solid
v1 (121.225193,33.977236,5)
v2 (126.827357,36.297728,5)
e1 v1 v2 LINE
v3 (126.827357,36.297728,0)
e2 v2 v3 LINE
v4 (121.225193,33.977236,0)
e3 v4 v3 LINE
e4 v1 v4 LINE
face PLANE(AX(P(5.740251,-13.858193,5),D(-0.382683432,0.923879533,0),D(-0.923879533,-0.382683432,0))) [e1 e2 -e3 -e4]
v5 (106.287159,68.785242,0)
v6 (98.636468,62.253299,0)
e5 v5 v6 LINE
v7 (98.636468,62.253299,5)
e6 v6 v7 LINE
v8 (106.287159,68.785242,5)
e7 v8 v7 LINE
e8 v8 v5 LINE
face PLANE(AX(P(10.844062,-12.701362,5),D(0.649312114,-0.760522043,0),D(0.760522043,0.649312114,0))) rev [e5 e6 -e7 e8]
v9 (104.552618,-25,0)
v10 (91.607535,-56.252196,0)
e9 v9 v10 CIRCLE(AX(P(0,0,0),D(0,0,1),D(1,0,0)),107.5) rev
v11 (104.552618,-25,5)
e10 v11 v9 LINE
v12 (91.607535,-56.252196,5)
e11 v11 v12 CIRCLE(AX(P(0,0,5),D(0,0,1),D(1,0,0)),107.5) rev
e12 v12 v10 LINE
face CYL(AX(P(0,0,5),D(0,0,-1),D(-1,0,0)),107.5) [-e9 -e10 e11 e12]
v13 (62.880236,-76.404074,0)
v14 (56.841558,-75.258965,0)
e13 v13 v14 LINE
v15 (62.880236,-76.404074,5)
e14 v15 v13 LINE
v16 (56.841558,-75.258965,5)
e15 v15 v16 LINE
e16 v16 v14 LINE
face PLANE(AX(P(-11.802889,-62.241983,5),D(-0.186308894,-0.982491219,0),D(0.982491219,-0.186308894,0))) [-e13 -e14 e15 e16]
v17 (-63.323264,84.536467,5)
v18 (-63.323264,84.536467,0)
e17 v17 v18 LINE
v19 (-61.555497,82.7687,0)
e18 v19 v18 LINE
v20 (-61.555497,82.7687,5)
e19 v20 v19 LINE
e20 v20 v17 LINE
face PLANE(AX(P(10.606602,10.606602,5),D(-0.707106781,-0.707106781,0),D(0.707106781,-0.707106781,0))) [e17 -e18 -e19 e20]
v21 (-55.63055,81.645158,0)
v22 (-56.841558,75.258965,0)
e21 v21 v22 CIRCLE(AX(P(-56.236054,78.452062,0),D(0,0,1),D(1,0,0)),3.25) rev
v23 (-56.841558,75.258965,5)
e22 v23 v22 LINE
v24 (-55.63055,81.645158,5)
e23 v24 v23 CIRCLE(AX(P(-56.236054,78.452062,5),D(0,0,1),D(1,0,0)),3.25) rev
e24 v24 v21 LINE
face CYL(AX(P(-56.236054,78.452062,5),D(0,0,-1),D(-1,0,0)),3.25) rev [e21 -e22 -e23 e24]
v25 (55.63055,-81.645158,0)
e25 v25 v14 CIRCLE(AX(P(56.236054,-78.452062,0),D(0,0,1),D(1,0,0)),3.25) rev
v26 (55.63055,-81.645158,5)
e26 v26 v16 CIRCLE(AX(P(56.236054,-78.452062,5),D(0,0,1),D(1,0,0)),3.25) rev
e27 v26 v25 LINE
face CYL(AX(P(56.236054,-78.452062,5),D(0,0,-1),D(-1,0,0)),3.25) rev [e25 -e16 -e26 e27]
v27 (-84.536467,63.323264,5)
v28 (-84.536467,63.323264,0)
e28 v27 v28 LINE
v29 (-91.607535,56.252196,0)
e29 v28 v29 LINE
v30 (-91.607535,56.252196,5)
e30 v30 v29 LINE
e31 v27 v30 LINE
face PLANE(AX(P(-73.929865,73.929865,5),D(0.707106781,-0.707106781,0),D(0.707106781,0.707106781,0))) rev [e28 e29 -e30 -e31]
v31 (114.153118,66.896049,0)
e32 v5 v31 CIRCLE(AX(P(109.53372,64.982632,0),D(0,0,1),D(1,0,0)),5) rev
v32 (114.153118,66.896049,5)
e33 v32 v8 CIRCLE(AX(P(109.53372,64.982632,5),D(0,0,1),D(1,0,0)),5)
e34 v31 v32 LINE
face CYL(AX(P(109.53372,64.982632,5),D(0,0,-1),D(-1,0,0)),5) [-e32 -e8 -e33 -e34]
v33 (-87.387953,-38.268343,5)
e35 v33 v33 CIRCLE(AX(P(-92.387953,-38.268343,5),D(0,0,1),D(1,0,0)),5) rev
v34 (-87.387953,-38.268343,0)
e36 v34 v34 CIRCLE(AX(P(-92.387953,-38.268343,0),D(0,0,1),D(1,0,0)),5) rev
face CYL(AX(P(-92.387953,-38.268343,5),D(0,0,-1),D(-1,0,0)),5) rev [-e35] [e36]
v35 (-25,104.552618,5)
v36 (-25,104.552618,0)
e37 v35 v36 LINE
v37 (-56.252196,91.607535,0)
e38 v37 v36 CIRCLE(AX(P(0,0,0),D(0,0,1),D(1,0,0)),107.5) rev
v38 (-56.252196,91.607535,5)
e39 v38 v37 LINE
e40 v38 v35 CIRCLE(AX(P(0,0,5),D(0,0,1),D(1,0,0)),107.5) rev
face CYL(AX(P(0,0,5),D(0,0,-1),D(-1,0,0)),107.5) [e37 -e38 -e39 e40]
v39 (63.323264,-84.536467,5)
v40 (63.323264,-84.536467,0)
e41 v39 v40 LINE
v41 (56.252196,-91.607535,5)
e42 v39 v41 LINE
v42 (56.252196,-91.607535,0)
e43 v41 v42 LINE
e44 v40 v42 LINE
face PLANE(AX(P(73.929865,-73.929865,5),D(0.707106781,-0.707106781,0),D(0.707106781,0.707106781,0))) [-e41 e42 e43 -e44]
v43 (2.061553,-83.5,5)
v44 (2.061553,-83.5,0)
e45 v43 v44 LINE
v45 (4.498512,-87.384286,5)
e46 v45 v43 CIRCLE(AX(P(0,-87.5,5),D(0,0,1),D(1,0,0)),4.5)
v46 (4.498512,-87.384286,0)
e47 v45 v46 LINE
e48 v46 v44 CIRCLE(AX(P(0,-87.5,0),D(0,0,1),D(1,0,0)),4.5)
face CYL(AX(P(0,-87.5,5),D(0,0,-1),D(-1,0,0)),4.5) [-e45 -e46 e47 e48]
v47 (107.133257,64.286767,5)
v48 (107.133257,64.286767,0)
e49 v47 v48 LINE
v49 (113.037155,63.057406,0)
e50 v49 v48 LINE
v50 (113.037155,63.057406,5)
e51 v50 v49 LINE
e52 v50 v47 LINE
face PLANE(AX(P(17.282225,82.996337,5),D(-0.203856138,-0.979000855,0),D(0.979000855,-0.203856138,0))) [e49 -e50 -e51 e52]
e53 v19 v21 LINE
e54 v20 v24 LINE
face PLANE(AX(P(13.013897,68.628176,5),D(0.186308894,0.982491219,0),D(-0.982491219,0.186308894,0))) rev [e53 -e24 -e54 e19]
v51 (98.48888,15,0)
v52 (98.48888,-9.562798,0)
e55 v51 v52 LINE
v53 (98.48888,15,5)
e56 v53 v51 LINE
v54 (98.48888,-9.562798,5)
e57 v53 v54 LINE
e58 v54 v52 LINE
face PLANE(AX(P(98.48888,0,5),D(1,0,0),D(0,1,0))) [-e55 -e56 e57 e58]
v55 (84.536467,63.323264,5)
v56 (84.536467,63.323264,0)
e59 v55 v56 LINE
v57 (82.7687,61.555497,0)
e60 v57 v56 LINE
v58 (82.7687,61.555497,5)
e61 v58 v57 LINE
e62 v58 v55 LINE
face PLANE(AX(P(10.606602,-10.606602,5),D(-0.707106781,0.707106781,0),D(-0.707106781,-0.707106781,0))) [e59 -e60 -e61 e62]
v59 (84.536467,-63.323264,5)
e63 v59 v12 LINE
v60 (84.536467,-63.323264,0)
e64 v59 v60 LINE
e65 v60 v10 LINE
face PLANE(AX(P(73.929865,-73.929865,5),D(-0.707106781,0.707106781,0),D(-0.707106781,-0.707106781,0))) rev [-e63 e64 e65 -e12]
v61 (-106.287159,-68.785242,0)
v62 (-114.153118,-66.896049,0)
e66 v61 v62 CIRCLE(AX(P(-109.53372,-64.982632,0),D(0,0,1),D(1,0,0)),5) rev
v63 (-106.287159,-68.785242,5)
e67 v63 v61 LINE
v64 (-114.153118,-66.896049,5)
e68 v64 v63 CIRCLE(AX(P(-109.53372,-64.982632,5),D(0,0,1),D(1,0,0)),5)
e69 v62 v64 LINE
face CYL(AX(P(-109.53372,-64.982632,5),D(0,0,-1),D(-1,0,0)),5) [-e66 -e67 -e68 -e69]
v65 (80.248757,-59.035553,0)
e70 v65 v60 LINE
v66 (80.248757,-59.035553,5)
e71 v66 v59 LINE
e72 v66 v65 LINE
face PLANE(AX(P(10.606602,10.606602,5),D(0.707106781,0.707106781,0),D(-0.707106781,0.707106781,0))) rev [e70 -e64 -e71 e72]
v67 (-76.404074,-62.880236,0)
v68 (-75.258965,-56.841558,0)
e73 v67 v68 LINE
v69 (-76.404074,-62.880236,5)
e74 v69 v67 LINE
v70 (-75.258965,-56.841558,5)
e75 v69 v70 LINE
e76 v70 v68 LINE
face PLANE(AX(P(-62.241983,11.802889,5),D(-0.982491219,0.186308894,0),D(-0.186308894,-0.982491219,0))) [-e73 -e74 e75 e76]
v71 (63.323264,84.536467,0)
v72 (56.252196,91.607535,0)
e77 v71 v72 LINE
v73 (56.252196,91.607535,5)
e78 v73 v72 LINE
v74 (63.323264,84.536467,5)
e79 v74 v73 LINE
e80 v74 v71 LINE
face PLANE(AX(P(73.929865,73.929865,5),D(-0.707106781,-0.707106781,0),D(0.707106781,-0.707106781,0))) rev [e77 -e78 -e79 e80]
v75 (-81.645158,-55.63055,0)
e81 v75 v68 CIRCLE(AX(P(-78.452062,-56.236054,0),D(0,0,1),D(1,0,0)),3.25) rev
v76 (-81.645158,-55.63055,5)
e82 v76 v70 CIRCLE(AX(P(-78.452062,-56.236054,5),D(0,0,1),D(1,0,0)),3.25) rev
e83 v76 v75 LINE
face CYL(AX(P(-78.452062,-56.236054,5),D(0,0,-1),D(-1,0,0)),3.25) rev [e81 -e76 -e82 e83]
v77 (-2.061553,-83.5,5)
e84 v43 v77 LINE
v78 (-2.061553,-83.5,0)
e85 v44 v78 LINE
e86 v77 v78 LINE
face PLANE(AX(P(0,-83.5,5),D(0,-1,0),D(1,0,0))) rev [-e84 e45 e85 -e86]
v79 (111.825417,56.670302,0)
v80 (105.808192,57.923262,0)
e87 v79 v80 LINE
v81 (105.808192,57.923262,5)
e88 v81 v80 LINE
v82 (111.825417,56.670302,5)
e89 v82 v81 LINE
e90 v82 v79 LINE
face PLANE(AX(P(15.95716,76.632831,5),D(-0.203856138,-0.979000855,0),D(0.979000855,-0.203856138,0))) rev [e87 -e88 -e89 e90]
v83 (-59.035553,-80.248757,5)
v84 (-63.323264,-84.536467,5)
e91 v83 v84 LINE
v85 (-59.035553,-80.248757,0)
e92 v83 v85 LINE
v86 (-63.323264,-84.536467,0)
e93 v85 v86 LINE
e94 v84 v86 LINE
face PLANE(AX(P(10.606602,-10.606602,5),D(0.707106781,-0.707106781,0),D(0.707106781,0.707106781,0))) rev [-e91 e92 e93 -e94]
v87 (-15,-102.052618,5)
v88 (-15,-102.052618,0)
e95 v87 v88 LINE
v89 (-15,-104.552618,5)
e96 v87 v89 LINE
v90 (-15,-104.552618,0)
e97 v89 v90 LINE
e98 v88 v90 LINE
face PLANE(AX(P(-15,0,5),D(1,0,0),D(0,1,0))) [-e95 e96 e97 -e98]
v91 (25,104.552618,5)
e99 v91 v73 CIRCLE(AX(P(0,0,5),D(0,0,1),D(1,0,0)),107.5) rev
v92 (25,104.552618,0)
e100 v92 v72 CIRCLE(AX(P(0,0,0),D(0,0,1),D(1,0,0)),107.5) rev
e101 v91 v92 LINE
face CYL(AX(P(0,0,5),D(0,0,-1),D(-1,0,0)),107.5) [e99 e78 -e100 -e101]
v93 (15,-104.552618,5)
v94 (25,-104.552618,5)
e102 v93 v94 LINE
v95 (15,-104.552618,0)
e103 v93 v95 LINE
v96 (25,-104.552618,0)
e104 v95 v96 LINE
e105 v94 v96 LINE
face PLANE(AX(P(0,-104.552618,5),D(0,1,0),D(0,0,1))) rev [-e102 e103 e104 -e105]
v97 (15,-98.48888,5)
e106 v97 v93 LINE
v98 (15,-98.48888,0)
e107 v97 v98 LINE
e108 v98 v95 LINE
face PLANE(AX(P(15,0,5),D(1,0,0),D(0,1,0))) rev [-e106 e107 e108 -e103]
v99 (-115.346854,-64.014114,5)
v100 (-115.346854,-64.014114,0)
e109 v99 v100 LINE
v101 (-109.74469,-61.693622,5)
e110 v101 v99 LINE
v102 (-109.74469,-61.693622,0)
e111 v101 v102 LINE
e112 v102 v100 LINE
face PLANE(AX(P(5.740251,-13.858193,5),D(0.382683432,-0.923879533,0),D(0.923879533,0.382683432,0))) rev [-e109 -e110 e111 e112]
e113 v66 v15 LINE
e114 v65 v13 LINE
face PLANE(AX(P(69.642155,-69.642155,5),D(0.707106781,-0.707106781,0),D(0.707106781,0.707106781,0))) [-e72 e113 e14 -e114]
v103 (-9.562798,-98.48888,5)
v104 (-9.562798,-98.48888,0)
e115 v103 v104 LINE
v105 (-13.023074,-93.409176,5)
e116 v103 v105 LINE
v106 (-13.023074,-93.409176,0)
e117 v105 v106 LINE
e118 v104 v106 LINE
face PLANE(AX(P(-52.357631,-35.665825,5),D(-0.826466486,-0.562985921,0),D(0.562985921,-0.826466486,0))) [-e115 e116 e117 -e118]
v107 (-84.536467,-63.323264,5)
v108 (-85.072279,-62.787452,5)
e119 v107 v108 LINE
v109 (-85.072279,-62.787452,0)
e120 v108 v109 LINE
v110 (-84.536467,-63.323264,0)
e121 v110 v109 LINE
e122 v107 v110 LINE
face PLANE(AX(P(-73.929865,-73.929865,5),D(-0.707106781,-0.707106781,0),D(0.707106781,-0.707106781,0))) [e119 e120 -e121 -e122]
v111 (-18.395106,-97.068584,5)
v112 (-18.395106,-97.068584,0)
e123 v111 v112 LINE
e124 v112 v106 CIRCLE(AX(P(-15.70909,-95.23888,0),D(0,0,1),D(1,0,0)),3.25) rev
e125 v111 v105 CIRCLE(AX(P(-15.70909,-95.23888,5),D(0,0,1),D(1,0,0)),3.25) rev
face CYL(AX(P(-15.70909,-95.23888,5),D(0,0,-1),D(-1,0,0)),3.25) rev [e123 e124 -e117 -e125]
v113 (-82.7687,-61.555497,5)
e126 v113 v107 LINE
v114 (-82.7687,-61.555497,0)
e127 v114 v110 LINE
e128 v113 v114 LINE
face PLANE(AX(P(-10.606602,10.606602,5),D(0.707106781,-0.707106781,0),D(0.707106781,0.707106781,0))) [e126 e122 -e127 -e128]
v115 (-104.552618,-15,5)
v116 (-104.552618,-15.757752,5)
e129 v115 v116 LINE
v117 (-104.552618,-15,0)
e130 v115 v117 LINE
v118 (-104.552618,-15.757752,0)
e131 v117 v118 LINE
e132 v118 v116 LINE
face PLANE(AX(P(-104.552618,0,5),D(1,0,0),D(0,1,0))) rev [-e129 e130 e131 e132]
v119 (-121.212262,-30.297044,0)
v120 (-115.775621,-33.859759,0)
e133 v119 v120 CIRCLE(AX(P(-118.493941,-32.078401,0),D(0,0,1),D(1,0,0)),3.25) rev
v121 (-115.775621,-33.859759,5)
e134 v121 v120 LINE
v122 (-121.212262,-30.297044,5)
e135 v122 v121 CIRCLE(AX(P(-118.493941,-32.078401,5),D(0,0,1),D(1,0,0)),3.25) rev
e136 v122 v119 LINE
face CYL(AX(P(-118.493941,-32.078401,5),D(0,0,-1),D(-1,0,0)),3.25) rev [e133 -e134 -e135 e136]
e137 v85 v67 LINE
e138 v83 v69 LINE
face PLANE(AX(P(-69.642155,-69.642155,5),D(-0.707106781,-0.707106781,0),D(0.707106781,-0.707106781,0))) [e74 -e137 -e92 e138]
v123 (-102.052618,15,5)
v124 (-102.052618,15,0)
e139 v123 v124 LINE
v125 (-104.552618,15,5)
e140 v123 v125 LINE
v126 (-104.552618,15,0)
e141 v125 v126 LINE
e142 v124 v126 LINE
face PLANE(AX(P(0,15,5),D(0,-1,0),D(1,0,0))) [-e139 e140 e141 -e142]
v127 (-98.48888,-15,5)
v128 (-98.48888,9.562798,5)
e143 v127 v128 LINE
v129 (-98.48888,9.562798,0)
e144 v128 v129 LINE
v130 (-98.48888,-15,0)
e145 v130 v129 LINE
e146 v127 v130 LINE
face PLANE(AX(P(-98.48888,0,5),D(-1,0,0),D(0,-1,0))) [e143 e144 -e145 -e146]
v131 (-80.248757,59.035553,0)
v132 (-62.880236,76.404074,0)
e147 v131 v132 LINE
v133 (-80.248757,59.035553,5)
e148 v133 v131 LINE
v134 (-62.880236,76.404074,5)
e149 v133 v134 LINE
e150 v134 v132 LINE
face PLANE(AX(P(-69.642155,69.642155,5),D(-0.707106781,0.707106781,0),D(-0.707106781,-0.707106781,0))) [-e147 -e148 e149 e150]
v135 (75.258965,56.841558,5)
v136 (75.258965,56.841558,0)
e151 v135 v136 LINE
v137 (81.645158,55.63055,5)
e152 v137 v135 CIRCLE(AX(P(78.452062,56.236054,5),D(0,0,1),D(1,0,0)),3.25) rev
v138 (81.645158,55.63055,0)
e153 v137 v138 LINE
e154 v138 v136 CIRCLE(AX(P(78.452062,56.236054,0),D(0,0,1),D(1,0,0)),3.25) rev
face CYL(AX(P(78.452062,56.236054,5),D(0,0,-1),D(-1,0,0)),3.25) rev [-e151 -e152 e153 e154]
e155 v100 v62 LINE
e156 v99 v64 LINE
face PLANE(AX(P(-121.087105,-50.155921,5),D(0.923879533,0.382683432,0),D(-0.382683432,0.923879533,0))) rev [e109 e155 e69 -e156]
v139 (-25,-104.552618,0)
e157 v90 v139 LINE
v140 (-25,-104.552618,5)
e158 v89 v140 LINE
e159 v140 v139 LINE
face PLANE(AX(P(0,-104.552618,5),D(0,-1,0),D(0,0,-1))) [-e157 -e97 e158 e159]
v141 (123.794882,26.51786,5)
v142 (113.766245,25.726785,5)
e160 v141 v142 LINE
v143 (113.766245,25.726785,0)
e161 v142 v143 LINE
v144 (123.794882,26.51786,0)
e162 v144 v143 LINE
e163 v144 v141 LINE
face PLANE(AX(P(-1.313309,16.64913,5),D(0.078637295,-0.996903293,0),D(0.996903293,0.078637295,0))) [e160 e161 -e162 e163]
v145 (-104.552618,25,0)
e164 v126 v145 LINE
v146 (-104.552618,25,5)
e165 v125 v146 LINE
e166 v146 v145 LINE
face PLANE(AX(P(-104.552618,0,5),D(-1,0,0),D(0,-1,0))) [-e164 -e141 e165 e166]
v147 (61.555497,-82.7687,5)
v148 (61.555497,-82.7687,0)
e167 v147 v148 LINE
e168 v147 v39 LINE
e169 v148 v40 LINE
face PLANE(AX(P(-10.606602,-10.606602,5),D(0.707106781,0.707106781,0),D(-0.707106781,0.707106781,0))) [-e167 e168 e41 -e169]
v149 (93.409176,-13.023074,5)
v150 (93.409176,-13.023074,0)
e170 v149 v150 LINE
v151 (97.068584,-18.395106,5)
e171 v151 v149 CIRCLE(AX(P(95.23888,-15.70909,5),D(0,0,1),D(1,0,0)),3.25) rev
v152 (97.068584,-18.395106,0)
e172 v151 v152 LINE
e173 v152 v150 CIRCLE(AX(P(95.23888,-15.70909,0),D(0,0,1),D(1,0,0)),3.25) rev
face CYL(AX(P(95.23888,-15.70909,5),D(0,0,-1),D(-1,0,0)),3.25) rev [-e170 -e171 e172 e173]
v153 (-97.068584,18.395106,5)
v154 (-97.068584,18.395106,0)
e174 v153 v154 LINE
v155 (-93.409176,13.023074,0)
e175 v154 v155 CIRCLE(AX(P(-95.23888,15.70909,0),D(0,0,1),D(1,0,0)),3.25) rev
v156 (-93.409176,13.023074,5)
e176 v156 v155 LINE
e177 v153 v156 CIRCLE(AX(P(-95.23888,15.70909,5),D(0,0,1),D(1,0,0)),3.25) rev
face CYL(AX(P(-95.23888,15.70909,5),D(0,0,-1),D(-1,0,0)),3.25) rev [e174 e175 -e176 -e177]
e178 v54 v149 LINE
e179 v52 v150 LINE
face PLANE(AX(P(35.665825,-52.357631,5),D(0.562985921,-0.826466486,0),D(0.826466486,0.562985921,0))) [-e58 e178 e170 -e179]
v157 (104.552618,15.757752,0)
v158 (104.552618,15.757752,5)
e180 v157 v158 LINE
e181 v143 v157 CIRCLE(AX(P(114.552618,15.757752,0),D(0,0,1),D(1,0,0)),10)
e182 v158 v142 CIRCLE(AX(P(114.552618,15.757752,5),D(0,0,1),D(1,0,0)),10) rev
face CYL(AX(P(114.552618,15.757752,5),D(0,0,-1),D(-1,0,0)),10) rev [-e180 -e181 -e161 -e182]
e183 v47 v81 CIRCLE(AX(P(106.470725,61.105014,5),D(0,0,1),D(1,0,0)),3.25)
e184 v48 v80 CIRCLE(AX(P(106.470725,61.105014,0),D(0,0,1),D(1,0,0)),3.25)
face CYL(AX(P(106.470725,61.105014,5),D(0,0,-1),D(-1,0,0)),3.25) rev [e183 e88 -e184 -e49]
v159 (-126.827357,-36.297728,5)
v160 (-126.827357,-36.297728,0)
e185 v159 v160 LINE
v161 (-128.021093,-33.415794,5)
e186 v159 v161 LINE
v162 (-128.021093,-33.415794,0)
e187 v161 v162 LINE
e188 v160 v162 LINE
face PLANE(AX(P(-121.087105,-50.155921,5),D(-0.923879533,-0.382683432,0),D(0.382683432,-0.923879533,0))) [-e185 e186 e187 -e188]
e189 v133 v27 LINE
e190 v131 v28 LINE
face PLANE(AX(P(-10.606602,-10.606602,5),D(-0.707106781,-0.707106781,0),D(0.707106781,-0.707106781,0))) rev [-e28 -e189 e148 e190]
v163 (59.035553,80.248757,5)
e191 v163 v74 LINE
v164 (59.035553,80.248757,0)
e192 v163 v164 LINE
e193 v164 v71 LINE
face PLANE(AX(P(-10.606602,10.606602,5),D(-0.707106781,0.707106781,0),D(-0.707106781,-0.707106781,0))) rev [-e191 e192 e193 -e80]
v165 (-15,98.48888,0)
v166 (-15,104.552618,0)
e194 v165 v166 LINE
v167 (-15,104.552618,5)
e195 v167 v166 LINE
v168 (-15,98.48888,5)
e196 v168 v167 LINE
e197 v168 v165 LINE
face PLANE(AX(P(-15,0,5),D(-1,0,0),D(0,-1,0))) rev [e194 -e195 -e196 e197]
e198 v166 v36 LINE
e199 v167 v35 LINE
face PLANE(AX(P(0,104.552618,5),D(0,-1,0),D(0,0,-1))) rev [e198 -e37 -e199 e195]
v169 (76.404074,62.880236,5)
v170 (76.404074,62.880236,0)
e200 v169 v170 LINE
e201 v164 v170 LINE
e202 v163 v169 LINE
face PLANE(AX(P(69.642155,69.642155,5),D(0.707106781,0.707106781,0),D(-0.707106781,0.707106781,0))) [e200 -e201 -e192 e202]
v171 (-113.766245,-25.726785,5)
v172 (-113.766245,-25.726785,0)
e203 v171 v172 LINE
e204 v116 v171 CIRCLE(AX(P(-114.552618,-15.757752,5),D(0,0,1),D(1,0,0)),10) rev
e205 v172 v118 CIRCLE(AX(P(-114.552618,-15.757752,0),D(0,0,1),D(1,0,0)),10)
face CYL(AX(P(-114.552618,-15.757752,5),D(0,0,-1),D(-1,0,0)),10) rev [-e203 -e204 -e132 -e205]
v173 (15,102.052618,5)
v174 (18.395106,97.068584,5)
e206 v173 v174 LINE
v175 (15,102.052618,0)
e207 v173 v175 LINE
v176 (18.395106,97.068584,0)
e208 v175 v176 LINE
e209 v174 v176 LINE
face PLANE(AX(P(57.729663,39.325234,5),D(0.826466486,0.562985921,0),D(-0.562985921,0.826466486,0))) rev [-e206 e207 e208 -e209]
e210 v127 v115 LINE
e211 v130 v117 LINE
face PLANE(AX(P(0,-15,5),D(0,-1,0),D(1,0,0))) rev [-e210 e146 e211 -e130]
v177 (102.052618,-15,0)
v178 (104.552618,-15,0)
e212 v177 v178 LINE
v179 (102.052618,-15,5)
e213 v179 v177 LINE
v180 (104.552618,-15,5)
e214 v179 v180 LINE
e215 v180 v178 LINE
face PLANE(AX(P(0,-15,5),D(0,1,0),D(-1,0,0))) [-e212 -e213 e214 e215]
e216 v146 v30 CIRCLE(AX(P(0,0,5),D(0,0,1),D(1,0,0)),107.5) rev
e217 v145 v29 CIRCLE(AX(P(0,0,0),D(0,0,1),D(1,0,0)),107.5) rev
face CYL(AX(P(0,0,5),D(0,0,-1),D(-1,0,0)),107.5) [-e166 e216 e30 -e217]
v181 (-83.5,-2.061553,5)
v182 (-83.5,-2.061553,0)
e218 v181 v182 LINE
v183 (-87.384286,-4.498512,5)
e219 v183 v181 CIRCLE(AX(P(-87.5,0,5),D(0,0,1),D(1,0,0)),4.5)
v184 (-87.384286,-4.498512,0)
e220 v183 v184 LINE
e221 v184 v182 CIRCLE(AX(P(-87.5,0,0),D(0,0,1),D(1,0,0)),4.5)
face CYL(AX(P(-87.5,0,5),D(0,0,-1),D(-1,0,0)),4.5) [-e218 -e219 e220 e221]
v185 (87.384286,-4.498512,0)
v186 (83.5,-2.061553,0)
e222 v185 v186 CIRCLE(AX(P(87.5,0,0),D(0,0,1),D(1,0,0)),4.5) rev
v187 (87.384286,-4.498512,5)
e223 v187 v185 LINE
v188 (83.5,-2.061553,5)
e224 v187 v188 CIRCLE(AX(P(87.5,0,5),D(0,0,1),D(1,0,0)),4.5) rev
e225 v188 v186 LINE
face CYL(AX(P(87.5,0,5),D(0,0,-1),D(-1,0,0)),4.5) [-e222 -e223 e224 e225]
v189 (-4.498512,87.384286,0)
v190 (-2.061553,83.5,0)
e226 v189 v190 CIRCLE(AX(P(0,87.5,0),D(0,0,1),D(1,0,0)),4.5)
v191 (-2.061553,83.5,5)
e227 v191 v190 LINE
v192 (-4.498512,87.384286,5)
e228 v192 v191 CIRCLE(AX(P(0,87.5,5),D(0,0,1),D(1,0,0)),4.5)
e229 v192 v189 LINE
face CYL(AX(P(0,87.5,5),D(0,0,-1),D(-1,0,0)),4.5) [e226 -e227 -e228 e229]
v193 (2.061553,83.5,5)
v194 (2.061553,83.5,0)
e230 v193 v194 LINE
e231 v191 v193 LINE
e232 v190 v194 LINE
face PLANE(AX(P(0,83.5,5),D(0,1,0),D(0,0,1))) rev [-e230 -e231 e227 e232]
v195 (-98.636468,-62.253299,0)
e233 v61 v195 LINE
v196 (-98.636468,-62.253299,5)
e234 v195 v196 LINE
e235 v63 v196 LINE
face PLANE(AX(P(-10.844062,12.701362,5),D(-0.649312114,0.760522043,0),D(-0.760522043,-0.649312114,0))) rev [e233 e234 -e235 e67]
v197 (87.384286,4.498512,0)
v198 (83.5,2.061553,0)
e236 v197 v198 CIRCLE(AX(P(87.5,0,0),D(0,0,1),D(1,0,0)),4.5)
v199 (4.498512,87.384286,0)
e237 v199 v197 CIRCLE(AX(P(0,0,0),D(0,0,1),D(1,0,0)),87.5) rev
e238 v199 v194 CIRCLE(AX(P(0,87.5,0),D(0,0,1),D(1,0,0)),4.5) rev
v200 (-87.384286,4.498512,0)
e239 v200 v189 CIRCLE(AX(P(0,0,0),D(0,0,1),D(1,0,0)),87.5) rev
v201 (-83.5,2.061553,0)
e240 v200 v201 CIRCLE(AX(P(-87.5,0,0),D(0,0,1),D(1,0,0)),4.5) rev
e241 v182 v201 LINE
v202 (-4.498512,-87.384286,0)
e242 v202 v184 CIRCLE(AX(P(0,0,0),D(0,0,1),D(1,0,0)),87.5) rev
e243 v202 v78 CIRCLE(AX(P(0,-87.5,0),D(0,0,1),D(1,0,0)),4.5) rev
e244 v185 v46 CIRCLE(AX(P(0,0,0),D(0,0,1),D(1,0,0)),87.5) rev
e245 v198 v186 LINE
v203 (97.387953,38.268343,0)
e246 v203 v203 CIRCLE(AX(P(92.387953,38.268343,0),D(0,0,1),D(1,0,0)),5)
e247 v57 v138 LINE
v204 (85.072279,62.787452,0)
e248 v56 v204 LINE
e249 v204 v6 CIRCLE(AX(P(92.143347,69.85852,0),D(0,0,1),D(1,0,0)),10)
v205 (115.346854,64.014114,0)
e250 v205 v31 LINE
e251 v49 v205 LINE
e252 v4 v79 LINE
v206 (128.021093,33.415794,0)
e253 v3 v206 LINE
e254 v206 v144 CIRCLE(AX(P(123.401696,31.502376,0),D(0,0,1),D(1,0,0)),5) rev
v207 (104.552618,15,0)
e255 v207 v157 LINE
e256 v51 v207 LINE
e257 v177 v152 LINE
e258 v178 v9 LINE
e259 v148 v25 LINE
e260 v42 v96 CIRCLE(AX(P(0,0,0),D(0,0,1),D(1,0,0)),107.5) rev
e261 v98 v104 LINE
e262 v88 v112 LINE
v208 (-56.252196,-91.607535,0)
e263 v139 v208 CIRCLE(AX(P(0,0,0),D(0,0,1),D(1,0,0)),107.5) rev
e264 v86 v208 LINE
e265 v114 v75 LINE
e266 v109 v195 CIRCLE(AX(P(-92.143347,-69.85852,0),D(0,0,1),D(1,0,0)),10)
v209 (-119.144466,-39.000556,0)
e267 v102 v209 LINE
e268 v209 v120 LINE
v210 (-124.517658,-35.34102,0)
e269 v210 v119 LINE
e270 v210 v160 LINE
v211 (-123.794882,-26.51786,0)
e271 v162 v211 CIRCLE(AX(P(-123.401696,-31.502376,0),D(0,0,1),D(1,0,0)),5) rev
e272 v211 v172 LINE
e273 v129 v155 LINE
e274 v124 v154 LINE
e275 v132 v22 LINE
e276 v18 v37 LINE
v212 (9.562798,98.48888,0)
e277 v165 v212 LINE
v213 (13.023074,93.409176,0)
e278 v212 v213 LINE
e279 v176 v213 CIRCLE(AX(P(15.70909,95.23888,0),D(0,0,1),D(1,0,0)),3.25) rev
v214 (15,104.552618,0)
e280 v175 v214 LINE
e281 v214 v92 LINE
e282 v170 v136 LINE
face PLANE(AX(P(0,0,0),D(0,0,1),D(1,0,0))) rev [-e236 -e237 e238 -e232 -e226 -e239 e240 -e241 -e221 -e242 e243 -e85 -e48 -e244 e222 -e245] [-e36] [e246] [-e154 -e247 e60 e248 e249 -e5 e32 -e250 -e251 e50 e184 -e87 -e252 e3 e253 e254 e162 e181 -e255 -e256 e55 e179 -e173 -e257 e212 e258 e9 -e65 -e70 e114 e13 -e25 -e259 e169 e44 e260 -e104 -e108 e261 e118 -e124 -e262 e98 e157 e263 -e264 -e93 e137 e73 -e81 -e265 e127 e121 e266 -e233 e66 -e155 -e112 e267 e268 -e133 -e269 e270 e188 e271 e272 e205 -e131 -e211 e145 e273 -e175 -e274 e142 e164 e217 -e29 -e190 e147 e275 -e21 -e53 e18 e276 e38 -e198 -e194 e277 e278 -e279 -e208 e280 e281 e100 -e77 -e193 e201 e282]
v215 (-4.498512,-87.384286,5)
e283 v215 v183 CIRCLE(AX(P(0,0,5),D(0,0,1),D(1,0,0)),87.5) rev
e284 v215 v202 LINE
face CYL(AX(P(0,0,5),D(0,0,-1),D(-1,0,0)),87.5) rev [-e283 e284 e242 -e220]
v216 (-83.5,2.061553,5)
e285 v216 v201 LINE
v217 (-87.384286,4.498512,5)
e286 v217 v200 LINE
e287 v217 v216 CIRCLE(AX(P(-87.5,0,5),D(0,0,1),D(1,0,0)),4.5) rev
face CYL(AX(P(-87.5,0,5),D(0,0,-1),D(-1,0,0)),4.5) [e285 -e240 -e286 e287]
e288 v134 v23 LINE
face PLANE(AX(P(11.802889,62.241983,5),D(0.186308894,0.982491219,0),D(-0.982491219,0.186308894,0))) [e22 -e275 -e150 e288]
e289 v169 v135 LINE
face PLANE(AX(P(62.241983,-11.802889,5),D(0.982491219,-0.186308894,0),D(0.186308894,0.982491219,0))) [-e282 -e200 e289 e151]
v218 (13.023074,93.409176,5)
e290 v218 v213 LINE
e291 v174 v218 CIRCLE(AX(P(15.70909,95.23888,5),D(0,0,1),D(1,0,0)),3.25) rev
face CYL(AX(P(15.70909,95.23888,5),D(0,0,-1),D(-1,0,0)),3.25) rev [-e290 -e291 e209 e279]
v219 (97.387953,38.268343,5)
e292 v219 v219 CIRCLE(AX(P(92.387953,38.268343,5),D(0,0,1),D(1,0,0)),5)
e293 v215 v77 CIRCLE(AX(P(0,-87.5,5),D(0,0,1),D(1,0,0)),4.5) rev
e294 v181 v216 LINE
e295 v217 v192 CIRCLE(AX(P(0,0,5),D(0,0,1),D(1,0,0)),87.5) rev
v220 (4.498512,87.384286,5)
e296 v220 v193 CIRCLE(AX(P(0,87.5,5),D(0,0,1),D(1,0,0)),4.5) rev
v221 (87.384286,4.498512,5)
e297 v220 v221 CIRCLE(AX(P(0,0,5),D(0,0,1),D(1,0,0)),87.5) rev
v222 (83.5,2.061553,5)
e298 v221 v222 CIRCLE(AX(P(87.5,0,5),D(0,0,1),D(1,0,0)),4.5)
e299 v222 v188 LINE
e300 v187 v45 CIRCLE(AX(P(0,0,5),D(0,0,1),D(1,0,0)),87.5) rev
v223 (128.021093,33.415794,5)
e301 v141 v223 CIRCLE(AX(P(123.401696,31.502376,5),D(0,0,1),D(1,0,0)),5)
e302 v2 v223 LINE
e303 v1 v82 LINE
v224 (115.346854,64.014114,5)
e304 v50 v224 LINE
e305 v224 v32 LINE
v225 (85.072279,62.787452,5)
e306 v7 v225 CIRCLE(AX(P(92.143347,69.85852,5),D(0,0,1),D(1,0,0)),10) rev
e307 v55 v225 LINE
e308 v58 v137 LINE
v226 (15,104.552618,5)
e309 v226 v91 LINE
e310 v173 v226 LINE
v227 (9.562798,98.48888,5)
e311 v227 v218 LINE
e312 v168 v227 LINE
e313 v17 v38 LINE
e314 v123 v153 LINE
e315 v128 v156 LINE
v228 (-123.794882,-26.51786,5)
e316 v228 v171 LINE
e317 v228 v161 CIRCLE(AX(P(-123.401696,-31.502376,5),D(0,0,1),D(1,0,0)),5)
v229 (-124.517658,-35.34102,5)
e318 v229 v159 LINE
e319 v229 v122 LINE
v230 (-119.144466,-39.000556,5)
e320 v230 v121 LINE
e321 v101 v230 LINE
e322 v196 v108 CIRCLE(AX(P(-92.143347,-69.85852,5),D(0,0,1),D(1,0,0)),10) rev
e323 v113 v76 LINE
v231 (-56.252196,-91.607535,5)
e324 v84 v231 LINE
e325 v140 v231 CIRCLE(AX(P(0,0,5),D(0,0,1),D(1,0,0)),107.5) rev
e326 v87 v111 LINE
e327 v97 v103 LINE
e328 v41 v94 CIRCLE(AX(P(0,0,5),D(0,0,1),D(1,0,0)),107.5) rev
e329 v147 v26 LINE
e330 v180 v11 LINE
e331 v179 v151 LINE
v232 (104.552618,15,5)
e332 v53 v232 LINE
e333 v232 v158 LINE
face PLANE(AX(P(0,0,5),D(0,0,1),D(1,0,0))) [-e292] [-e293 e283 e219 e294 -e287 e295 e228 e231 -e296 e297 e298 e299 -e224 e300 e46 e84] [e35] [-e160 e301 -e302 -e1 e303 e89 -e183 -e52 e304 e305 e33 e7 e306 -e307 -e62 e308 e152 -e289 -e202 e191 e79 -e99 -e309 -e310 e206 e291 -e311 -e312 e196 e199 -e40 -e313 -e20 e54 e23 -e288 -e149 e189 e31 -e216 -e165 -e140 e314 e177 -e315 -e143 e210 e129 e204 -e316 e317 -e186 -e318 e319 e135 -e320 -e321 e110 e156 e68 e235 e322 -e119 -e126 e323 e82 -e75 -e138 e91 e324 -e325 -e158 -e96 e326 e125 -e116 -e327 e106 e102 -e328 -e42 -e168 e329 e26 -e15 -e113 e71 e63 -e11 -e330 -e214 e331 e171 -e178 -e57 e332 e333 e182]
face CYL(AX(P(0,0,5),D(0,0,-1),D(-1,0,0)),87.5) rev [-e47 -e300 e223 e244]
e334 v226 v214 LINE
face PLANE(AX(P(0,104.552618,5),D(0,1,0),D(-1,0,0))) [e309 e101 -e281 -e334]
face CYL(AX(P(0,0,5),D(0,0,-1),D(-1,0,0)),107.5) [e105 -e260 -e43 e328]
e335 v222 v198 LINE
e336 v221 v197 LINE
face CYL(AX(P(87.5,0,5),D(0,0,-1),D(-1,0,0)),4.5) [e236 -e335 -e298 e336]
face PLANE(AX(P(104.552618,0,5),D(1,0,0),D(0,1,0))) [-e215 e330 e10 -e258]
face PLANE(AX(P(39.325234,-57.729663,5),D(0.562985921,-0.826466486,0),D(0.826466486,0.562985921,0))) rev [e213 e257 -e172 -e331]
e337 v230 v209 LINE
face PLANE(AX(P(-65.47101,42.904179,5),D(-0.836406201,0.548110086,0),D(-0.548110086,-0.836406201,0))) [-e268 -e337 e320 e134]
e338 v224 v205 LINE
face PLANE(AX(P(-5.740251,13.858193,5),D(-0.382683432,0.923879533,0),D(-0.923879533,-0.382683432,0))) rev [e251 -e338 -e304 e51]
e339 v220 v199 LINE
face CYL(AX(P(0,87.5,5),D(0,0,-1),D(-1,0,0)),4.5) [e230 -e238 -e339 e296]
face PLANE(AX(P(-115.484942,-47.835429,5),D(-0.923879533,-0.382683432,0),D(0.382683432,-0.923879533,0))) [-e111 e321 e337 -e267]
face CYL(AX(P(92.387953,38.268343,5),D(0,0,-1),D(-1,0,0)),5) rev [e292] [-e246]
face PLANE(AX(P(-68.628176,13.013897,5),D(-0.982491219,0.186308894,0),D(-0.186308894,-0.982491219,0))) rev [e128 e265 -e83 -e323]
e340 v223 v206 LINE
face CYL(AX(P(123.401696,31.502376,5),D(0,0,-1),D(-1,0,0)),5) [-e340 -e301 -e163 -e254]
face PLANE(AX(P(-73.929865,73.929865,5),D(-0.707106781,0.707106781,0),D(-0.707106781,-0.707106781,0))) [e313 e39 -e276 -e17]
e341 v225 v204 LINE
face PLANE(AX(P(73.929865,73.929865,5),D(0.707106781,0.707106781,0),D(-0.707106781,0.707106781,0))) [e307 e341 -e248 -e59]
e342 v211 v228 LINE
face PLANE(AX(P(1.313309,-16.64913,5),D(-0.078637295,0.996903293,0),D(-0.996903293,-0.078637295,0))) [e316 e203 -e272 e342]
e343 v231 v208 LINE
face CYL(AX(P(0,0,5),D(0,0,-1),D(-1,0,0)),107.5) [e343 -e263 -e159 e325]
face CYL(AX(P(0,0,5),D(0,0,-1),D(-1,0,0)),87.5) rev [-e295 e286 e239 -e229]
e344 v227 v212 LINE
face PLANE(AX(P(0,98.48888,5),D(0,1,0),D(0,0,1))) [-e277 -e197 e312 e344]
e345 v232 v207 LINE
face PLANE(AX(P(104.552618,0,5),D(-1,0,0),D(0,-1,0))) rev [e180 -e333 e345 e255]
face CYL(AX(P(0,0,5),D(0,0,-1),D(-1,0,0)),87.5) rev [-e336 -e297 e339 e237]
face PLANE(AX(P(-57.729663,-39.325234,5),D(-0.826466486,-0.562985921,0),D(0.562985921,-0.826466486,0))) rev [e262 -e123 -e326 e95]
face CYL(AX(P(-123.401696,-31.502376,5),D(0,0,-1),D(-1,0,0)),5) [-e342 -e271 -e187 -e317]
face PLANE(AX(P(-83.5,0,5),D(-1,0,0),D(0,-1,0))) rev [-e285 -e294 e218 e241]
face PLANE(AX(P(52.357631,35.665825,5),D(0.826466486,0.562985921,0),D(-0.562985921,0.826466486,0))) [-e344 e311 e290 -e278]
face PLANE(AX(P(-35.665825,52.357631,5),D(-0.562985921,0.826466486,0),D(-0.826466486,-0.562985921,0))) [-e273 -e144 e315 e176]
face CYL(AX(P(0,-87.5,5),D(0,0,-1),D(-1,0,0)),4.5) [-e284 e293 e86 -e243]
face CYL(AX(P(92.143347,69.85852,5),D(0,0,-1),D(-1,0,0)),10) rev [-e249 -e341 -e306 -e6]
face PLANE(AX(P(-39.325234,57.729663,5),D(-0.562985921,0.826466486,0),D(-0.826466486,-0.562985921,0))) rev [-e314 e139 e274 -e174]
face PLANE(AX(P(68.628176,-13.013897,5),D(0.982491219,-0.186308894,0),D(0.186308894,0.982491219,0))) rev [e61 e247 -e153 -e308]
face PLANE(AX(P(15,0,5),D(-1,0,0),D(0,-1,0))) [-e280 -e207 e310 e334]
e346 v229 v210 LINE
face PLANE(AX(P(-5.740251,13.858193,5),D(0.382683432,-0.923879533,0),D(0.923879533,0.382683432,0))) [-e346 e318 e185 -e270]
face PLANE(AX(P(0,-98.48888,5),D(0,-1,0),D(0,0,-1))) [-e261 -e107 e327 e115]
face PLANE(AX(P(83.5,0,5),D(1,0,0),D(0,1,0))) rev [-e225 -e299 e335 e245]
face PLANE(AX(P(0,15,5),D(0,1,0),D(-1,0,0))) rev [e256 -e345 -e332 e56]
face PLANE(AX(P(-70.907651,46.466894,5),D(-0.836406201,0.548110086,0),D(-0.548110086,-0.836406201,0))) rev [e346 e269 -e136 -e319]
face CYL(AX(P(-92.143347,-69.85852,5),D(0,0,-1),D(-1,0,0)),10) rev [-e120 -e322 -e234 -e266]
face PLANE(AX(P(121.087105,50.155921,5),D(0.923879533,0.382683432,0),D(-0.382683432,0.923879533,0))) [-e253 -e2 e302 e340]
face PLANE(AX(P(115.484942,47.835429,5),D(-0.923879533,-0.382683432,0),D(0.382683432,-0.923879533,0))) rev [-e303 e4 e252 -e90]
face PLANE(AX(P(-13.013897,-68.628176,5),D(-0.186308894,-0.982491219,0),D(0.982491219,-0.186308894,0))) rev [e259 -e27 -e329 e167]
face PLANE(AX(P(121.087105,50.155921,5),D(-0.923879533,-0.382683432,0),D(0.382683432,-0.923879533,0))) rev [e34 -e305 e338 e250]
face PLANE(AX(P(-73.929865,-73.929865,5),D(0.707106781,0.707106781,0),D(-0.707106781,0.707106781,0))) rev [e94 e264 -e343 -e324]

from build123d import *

# Parameters (mm, degrees)
BOSS_EXTRU_1_OUTLINE_R = 5
BOSS_EXTRU_1_DEPTH     = 5
CONG_2_R               = 10
CONG_3_R               = 5


# Read off the part's stored shape, not the designer's step: Boss.-Extru.1
with BuildPart() as part:
    # Boss.-Extru.1 outline → Boss.-Extru.1 (new body)
    with BuildSketch(Plane.XY):
        with BuildLine():
            Line((111.825417275, 56.670302216), (105.808192277, 57.923261539))
            ThreePointArc((105.808192277, 57.923261539), (103.288971945, 61.767546768), (107.133257174, 64.2867671))
            Line((107.133257174, 64.2867671), (113.037155155, 63.057405721))
            Line((113.037155155, 63.057405721), (115.346853986, 64.014114302))
            Line((115.346853986, 64.014114302), (111.520019662, 73.252909628))
            Line((111.520019662, 73.252909628), (91.607534943, 56.252195883))
            Line((91.607534943, 56.252195883), (84.536467131, 63.323263695))
            Line((84.536467131, 63.323263695), (82.768700178, 61.555496742))
            Line((82.768700178, 61.555496742), (81.64515805, 55.630550004))
            ThreePointArc((81.64515805, 55.630550004), (77.846557681, 53.042957448), (75.258965125, 56.841557817))
            Line((75.258965125, 56.841557817), (76.404073966, 62.880235609))
            Line((76.404073966, 62.880235609), (59.03555307, 80.248756505))
            Line((59.03555307, 80.248756505), (63.323263695, 84.536467131))
            Line((63.323263695, 84.536467131), (56.252195883, 91.607534943))
            ThreePointArc((56.252195883, 91.607534943), (41.138468979, 99.317049745), (25, 104.552618332))
            Line((25, 104.552618332), (15, 104.552618332))
            Line((15, 104.552618332), (15, 102.052618332))
            Line((15, 102.052618332), (18.395105759, 97.068584057))
            ThreePointArc((18.395105759, 97.068584057), (17.538793922, 92.552863734), (13.023073599, 93.40917557))
            Line((13.023073599, 93.40917557), (9.56279781, 98.488879813))
            Line((9.56279781, 98.488879813), (-15, 98.488879813))
            Line((-15, 98.488879813), (-15, 104.552618332))
            Line((-15, 104.552618332), (-25, 104.552618332))
            ThreePointArc((-25, 104.552618332), (-41.138468979, 99.317049745), (-56.252195883, 91.607534943))
            Line((-56.252195883, 91.607534943), (-63.323263695, 84.536467131))
            Line((-63.323263695, 84.536467131), (-61.555496742, 82.768700178))
            Line((-61.555496742, 82.768700178), (-55.630550004, 81.64515805))
            ThreePointArc((-55.630550004, 81.64515805), (-53.042957448, 77.846557681), (-56.841557817, 75.258965125))
            Line((-56.841557817, 75.258965125), (-62.880235609, 76.404073966))
            Line((-62.880235609, 76.404073966), (-80.248756505, 59.03555307))
            Line((-80.248756505, 59.03555307), (-84.536467131, 63.323263695))
            Line((-84.536467131, 63.323263695), (-91.607534943, 56.252195883))
            ThreePointArc((-91.607534943, 56.252195883), (-99.317049745, 41.138468979), (-104.552618332, 25))
            Line((-104.552618332, 25), (-104.552618332, 15))
            Line((-104.552618332, 15), (-102.052618332, 15))
            Line((-102.052618332, 15), (-97.068584057, 18.395105759))
            ThreePointArc((-97.068584057, 18.395105759), (-92.552863734, 17.538793922), (-93.40917557, 13.023073599))
            Line((-93.40917557, 13.023073599), (-98.488879813, 9.56279781))
            Line((-98.488879813, 9.56279781), (-98.488879813, -15))
            Line((-98.488879813, -15), (-104.552618332, -15))
            Line((-104.552618332, -15), (-104.552618332, -25))
            Line((-104.552618332, -25), (-130.65419128, -27.058933002))
            Line((-130.65419128, -27.058933002), (-126.827356957, -36.297728327))
            Line((-126.827356957, -36.297728327), (-124.517658126, -35.341019746))
            Line((-124.517658126, -35.341019746), (-121.212261595, -30.297043681))
            ThreePointArc((-121.212261595, -30.297043681), (-116.712583661, -29.360081308), (-115.775621287, -33.859759242))
            Line((-115.775621287, -33.859759242), (-119.144465853, -39.000555875))
            Line((-119.144465853, -39.000555875), (-109.744690078, -61.693622033))
            Line((-109.744690078, -61.693622033), (-115.346853986, -64.014114302))
            Line((-115.346853986, -64.014114302), (-111.520019662, -73.252909628))
            Line((-111.520019662, -73.252909628), (-91.607534943, -56.252195883))
            Line((-91.607534943, -56.252195883), (-84.536467131, -63.323263695))
            Line((-84.536467131, -63.323263695), (-82.768700178, -61.555496742))
            Line((-82.768700178, -61.555496742), (-81.64515805, -55.630550004))
            ThreePointArc((-81.64515805, -55.630550004), (-77.846557681, -53.042957448), (-75.258965125, -56.841557817))
            Line((-75.258965125, -56.841557817), (-76.404073966, -62.880235609))
            Line((-76.404073966, -62.880235609), (-59.03555307, -80.248756505))
            Line((-59.03555307, -80.248756505), (-63.323263695, -84.536467131))
            Line((-63.323263695, -84.536467131), (-56.252195883, -91.607534943))
            ThreePointArc((-56.252195883, -91.607534943), (-41.138468979, -99.317049745), (-25, -104.552618332))
            Line((-25, -104.552618332), (-15, -104.552618332))
            Line((-15, -104.552618332), (-15, -102.052618332))
            Line((-15, -102.052618332), (-18.395105759, -97.068584057))
            ThreePointArc((-18.395105759, -97.068584057), (-17.538793922, -92.552863734), (-13.023073599, -93.40917557))
            Line((-13.023073599, -93.40917557), (-9.56279781, -98.488879813))
            Line((-9.56279781, -98.488879813), (15, -98.488879813))
            Line((15, -98.488879813), (15, -104.552618332))
            Line((15, -104.552618332), (25, -104.552618332))
            ThreePointArc((25, -104.552618332), (41.138468979, -99.317049745), (56.252195883, -91.607534943))
            Line((56.252195883, -91.607534943), (63.323263695, -84.536467131))
            Line((63.323263695, -84.536467131), (61.555496742, -82.768700178))
            Line((61.555496742, -82.768700178), (55.630550004, -81.64515805))
            ThreePointArc((55.630550004, -81.64515805), (53.042957448, -77.846557681), (56.841557817, -75.258965125))
            Line((56.841557817, -75.258965125), (62.880235609, -76.404073966))
            Line((62.880235609, -76.404073966), (80.248756505, -59.03555307))
            Line((80.248756505, -59.03555307), (84.536467131, -63.323263695))
            Line((84.536467131, -63.323263695), (91.607534943, -56.252195883))
            ThreePointArc((91.607534943, -56.252195883), (99.317049745, -41.138468979), (104.552618332, -25))
            Line((104.552618332, -25), (104.552618332, -15))
            Line((104.552618332, -15), (102.052618332, -15))
            Line((102.052618332, -15), (97.068584057, -18.395105759))
            ThreePointArc((97.068584057, -18.395105759), (92.552863734, -17.538793922), (93.40917557, -13.023073599))
            Line((93.40917557, -13.023073599), (98.488879813, -9.56279781))
            Line((98.488879813, -9.56279781), (98.488879813, 15))
            Line((98.488879813, 15), (104.552618332, 15))
            Line((104.552618332, 15), (104.552618332, 25))
            Line((104.552618332, 25), (130.65419128, 27.058933002))
            Line((130.65419128, 27.058933002), (126.827356957, 36.297728327))
            Line((126.827356957, 36.297728327), (121.225193049, 33.977236058))
            Line((121.225193049, 33.977236058), (111.825417275, 56.670302216))
        make_face()
        with Locations((-92.387953251, -38.268343237)):
            Circle(BOSS_EXTRU_1_OUTLINE_R, mode=Mode.SUBTRACT)
        with BuildLine():
            ThreePointArc((-2.061552813, -83.5), (-3.811893422, -85.108458961), (-4.498511999, -87.384285714))
            ThreePointArc((-4.498511999, -87.384285714), (-61.871843354, -61.871843354), (-87.384285714, -4.498511999))
            ThreePointArc((-87.384285714, -4.498511999), (-85.108458961, -3.811893422), (-83.5, -2.061552813))
            Line((-83.5, -2.061552813), (-83.5, 2.061552813))
            ThreePointArc((-83.5, 2.061552813), (-85.108458961, 3.811893422), (-87.384285714, 4.498511999))
            ThreePointArc((-87.384285714, 4.498511999), (-61.871843354, 61.871843354), (-4.498511999, 87.384285714))
            ThreePointArc((-4.498511999, 87.384285714), (-3.811893422, 85.108458961), (-2.061552813, 83.5))
            Line((-2.061552813, 83.5), (2.061552813, 83.5))
            ThreePointArc((2.061552813, 83.5), (3.811893422, 85.108458961), (4.498511999, 87.384285714))
            ThreePointArc((4.498511999, 87.384285714), (61.871843354, 61.871843354), (87.384285714, 4.498511999))
            ThreePointArc((87.384285714, 4.498511999), (85.108458961, 3.811893422), (83.5, 2.061552813))
            Line((83.5, 2.061552813), (83.5, -2.061552813))
            ThreePointArc((83.5, -2.061552813), (85.108458961, -3.811893422), (87.384285714, -4.498511999))
            ThreePointArc((87.384285714, -4.498511999), (61.871843354, -61.871843354), (4.498511999, -87.384285714))
            ThreePointArc((4.498511999, -87.384285714), (3.811893422, -85.108458961), (2.061552813, -83.5))
            Line((2.061552813, -83.5), (-2.061552813, -83.5))
        make_face(mode=Mode.SUBTRACT)
        with Locations((92.387953251, 38.268343237)):
            Circle(BOSS_EXTRU_1_OUTLINE_R, mode=Mode.SUBTRACT)
    extrude(amount=BOSS_EXTRU_1_DEPTH)

    # Congé2
    cong_2_edges = [part.edges().sort_by_distance(p)[0] for p in [
        (104.552618332, 25, 2.5),
        (-91.607534943, -56.252195883, 2.5),
        (-104.552618332, -25, 2.5),
        (91.607534943, 56.252195883, 2.5),
    ]]
    fillet(cong_2_edges, radius=CONG_2_R)

    # Congé3
    cong_3_edges = [part.edges().sort_by_distance(p)[0] for p in [
        (130.65419128, 27.058933002, 2.5),
        (-111.520019662, -73.252909628, 2.5),
        (-130.65419128, -27.058933002, 2.5),
        (111.520019662, 73.252909628, 2.5),
    ]]
    fillet(cong_3_edges, radius=CONG_3_R)


solid = part.part
